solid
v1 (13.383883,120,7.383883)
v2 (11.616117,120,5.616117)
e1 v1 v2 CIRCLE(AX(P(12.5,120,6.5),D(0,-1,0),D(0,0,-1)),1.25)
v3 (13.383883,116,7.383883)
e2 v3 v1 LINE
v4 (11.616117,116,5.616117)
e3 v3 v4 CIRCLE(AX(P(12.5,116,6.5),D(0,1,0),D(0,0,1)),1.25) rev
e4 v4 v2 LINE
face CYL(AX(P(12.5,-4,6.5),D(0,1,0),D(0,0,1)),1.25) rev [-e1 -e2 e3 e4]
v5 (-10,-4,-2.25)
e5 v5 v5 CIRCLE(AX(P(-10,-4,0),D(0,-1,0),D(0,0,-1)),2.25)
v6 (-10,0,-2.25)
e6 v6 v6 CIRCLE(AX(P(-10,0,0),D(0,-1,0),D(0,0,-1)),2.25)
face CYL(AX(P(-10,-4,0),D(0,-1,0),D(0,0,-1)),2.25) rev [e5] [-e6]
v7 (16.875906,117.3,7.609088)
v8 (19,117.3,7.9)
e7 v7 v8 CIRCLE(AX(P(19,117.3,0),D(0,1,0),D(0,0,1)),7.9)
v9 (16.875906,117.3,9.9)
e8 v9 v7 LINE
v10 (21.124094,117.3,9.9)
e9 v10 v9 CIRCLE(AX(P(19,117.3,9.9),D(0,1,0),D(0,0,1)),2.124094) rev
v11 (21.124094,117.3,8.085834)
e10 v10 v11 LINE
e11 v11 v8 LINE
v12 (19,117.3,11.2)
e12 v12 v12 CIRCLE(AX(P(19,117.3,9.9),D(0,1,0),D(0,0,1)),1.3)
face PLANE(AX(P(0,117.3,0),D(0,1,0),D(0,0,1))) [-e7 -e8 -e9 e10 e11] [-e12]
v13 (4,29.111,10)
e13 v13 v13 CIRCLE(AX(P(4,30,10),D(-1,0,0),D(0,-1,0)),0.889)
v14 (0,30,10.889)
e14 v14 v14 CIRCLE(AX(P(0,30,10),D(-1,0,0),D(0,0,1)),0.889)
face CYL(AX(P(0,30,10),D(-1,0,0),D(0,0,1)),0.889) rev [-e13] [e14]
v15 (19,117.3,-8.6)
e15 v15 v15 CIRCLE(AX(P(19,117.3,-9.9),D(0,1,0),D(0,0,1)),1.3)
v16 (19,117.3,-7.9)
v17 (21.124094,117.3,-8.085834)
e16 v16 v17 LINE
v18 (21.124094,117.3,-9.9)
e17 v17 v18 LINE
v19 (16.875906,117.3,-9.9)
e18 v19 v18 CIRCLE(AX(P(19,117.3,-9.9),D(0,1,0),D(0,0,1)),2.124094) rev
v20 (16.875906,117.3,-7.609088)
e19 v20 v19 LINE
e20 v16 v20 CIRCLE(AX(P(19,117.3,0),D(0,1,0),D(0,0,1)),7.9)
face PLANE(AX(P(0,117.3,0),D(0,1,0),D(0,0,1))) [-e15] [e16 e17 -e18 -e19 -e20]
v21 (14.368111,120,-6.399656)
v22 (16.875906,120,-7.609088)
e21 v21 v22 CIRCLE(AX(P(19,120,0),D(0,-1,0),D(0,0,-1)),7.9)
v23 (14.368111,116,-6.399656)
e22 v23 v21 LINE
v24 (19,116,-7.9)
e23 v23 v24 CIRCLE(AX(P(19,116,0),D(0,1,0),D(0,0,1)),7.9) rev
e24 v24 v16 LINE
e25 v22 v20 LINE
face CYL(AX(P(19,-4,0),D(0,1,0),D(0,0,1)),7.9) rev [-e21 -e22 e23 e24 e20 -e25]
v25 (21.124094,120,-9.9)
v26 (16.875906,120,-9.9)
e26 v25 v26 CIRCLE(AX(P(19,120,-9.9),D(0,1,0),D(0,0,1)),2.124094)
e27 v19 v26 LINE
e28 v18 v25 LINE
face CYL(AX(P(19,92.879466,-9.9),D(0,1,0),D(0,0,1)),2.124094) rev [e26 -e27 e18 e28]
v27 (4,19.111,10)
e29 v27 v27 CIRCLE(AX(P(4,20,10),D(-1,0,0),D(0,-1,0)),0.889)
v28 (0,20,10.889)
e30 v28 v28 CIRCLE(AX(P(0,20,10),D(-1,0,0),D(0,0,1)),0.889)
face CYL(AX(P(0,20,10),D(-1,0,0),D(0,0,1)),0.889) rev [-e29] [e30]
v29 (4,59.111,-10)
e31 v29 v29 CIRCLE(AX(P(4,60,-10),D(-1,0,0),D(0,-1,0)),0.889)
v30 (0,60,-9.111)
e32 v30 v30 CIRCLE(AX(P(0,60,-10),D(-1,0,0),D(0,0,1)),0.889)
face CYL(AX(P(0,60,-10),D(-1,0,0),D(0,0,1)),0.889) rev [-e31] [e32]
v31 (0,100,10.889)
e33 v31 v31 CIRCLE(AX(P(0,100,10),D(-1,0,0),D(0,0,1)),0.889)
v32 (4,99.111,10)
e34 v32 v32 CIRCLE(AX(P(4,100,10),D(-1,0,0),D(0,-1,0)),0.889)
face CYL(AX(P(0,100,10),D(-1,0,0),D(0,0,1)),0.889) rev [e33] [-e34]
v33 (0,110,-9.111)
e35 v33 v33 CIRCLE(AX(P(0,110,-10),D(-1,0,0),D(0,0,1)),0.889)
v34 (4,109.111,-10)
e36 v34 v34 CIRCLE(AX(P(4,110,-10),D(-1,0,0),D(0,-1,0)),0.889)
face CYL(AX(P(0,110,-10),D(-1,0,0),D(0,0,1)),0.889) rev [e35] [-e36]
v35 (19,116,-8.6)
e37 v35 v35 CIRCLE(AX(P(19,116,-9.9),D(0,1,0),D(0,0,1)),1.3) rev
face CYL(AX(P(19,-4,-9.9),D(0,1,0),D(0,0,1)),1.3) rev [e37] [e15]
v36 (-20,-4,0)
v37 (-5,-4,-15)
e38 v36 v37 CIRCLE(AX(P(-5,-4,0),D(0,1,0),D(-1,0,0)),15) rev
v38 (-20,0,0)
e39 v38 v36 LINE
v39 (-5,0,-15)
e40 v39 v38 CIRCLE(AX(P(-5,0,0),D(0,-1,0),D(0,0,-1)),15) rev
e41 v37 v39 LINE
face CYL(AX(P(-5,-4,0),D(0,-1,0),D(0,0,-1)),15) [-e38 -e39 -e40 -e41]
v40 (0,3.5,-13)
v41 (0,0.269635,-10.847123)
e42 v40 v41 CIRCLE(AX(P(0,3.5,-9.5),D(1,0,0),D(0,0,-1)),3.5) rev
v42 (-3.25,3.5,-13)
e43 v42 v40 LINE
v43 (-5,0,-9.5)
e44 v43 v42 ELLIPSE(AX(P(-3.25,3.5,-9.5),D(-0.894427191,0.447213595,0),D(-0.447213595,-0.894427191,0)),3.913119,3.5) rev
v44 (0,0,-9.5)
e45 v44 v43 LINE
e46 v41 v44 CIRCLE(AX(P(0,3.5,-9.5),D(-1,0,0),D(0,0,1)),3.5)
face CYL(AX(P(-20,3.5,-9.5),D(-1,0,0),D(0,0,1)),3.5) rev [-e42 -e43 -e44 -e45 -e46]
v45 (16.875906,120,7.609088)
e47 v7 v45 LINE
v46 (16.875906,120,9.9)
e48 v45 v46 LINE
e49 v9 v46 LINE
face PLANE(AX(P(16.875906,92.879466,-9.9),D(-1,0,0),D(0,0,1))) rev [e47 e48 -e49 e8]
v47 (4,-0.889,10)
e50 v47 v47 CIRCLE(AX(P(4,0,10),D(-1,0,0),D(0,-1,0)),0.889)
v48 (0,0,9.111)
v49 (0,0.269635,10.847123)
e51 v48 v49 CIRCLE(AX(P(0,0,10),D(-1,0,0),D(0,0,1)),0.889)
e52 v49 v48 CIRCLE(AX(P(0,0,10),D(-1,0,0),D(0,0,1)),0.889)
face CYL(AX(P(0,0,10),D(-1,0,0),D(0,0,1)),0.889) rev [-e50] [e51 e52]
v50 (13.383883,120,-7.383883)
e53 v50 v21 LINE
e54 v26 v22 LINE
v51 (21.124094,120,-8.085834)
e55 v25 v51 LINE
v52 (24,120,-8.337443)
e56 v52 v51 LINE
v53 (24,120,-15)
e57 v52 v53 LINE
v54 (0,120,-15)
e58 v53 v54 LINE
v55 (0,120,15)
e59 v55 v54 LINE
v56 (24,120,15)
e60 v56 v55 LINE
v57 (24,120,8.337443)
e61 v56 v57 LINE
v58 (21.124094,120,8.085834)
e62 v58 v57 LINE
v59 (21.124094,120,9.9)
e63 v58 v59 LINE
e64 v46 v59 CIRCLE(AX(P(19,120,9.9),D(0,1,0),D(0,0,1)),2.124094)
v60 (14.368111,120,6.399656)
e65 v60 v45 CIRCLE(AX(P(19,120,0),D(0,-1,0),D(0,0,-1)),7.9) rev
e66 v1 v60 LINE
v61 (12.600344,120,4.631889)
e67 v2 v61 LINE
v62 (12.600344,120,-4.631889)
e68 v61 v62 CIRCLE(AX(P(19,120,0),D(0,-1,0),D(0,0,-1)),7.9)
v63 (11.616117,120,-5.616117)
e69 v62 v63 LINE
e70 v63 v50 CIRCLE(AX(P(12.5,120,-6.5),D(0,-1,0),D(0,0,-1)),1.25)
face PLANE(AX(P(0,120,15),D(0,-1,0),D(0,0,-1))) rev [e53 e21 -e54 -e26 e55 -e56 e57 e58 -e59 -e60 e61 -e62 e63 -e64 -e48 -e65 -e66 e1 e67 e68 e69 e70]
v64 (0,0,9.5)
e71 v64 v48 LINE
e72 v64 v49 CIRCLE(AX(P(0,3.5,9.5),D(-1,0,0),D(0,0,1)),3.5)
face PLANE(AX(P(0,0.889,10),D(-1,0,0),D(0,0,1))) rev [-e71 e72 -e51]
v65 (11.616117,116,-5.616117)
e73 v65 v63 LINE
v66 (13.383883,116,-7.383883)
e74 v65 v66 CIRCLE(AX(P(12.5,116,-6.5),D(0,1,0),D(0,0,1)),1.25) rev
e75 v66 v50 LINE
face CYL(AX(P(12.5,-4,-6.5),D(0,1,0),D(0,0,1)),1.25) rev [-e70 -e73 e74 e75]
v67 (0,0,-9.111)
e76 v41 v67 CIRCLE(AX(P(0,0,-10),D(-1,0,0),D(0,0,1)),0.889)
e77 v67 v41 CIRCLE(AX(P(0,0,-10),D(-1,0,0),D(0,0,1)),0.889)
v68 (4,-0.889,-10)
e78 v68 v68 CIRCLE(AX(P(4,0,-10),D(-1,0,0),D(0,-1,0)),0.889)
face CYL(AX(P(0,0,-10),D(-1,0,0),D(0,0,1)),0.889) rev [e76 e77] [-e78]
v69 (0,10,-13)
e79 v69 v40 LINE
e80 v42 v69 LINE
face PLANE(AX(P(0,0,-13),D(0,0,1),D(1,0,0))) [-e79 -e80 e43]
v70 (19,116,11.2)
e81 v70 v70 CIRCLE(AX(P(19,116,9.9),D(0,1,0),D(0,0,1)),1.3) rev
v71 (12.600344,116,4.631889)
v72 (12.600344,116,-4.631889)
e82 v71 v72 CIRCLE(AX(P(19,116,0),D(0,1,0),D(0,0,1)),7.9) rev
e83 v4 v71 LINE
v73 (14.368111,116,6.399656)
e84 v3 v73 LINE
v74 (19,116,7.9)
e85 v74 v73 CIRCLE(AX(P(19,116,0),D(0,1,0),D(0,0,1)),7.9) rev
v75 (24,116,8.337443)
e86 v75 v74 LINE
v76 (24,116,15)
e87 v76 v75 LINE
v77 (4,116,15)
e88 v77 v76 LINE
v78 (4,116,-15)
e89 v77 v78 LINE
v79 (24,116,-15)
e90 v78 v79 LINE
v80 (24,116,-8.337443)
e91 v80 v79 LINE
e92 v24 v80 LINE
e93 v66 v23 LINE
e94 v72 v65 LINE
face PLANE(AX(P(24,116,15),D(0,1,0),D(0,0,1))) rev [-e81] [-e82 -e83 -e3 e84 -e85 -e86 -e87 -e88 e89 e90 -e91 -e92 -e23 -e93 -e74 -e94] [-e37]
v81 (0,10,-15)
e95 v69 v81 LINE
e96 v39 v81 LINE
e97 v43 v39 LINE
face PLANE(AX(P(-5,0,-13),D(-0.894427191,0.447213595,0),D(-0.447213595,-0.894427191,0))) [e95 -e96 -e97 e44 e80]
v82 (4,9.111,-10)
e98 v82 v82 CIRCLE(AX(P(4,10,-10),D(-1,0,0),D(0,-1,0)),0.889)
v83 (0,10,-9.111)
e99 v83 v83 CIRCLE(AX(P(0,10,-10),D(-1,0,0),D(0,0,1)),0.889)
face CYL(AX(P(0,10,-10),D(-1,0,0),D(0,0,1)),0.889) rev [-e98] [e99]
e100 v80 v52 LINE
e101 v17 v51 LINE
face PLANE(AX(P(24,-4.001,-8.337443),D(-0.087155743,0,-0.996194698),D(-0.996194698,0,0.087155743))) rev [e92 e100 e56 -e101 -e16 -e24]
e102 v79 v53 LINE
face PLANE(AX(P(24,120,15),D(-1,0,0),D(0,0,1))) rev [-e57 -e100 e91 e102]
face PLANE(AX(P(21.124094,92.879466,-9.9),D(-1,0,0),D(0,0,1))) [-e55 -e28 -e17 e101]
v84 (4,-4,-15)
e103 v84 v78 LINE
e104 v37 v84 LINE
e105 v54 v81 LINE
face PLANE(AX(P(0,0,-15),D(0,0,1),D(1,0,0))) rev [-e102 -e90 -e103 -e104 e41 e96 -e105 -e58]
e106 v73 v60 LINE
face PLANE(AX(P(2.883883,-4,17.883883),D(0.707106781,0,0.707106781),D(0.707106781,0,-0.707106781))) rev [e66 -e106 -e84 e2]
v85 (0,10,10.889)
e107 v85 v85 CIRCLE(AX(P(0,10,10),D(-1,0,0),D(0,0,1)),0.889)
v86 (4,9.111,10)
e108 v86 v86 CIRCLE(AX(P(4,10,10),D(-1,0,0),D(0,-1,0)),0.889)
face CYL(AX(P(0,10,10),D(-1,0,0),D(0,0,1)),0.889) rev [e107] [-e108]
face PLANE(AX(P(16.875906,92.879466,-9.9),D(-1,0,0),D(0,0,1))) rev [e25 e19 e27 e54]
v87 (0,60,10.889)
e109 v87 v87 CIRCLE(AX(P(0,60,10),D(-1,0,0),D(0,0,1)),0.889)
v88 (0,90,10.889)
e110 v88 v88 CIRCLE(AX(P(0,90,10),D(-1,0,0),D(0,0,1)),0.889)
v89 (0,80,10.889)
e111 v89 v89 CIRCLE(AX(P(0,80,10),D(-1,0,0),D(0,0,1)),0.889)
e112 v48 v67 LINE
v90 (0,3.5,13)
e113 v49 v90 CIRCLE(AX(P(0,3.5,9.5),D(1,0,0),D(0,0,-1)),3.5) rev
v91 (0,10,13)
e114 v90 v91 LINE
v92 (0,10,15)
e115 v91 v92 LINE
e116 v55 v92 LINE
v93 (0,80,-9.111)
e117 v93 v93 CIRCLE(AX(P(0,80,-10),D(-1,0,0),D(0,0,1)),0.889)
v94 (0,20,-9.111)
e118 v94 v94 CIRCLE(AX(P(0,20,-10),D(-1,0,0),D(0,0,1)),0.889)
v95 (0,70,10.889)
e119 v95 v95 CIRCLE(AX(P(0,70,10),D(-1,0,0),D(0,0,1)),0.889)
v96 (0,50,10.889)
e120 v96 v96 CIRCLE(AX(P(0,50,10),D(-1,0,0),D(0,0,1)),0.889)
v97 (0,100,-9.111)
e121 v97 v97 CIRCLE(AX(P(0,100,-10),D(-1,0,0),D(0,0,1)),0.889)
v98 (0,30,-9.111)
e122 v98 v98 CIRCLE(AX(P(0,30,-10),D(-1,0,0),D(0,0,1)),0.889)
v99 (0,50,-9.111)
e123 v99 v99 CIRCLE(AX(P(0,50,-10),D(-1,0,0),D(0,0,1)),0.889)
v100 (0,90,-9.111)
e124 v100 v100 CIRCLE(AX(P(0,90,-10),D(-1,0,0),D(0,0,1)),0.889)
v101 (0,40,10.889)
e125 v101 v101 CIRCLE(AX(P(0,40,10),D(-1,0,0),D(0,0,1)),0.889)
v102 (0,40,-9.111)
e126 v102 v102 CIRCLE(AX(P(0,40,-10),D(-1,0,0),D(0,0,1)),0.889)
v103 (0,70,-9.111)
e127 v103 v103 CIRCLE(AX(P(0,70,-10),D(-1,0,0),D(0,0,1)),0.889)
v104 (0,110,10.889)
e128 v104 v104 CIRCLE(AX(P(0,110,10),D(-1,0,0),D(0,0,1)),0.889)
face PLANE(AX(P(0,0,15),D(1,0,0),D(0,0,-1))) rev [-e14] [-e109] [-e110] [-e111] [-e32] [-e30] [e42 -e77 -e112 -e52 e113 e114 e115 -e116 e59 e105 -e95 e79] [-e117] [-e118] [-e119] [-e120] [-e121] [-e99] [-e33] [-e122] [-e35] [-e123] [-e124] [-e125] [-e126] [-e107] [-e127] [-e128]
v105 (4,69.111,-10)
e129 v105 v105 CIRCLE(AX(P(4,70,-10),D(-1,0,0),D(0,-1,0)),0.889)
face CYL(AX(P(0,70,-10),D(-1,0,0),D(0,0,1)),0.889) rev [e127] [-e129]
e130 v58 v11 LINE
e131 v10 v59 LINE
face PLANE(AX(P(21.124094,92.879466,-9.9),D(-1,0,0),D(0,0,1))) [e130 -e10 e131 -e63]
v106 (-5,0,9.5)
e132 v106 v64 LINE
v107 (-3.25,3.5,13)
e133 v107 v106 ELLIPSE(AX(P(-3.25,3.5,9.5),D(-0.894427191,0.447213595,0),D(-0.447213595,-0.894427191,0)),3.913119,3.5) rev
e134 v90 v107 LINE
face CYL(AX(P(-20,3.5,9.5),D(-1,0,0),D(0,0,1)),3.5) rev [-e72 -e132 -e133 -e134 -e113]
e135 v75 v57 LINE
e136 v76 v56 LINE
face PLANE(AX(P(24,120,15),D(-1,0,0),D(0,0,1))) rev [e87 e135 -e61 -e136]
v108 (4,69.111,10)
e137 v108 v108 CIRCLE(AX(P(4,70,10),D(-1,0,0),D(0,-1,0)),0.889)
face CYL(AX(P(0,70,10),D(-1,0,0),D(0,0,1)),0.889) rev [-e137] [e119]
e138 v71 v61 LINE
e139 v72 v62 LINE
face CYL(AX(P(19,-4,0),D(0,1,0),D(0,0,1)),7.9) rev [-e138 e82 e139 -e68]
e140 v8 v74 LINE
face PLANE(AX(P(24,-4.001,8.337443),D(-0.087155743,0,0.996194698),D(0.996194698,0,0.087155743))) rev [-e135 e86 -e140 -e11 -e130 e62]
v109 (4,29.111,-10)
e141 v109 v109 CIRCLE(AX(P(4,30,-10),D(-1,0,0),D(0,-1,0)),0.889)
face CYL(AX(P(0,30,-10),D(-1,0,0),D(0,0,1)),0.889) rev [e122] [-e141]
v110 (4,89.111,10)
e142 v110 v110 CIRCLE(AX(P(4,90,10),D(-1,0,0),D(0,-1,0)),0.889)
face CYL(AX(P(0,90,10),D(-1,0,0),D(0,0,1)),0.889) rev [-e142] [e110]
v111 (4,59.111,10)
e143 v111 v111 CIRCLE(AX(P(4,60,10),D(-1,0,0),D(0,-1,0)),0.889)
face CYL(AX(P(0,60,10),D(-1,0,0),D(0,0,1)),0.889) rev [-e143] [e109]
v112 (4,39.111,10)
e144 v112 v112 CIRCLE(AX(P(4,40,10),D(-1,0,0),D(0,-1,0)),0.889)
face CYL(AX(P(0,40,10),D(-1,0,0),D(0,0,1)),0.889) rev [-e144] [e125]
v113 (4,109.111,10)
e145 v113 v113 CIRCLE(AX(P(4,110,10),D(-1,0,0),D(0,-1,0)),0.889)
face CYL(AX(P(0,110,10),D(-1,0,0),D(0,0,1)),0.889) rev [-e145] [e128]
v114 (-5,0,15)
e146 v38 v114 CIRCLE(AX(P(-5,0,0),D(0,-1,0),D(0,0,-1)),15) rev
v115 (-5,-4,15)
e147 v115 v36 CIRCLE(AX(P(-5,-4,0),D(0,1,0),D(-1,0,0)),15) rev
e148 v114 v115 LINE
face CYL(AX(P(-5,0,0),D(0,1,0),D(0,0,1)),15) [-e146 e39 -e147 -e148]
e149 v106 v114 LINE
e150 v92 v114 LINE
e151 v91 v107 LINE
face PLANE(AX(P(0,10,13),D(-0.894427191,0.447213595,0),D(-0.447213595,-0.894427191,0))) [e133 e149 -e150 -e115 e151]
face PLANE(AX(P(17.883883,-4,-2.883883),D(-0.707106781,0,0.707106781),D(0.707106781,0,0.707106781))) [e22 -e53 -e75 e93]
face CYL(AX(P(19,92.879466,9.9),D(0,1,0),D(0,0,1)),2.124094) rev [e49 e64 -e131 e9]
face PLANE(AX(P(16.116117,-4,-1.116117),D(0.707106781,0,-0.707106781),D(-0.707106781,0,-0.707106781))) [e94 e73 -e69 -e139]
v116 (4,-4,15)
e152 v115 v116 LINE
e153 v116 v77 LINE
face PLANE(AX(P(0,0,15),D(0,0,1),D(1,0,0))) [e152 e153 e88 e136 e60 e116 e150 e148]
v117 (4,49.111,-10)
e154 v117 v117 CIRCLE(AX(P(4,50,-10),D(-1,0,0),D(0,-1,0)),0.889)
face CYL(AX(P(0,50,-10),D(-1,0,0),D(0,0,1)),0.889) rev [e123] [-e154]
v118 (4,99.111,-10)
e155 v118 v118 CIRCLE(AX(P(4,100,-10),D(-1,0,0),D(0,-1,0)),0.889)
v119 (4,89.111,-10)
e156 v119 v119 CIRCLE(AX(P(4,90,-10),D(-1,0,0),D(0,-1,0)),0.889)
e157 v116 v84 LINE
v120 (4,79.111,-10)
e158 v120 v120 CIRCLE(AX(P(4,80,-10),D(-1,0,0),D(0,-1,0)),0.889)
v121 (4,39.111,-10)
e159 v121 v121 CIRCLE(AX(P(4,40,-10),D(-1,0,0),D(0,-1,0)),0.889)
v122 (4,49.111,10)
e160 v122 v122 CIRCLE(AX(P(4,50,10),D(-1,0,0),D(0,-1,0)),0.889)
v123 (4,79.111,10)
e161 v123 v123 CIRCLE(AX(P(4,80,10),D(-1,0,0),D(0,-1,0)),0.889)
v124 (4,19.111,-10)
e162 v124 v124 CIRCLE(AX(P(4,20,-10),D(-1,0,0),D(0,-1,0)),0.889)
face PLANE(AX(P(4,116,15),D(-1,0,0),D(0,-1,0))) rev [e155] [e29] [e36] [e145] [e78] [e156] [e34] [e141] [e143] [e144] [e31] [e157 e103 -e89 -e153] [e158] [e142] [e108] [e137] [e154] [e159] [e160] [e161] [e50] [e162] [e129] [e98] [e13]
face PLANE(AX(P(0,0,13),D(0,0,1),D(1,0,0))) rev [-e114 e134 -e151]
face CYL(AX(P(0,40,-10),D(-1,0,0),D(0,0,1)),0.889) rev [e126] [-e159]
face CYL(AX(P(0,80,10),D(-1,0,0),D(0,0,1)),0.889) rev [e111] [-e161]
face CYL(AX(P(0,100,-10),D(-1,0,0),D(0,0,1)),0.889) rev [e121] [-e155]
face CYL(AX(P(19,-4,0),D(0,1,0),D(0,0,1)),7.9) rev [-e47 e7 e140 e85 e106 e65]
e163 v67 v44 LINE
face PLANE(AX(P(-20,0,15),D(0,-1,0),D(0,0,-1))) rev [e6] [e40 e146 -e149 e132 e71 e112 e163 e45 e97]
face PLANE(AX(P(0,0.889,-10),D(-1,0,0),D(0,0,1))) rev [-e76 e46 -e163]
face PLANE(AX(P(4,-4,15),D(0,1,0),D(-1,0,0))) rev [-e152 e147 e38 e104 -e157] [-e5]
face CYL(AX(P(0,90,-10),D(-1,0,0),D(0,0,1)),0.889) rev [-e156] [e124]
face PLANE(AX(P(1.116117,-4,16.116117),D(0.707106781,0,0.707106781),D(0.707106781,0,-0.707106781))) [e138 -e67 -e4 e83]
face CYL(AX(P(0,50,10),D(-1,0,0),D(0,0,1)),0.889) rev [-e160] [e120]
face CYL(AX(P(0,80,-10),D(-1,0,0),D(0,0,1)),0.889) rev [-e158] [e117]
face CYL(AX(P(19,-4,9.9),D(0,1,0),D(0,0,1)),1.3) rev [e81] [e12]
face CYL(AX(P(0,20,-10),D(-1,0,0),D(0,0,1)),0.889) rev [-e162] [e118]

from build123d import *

# Parameters (mm, degrees)
BRACKETMAINBODY_DEPTH         = 15
CUTEXTRUDE_SQUIDCUTOUTS_START = 120
SQUIDCUTOUTS_R                = 1.3
CUTEXTRUDE_SQUIDCUTOUTS_DEPTH = 244.292335528
M4_CLEARANCE_HOLE1_D          = 4.5
CUT_EXTRUDE12_REACH           = 129.189
FILLET11_R                    = 15
FILLET12_R                    = 15
F_2_56_TAPPED_HOLE1_D         = 1.778
LPATTERN3_OUTLINE_R           = 0.889
LPATTERN3_DEPTH               = 4
CUT_EXTRUDE14_START           = -2.7
CUT_EXTRUDE14_OUTLINE_R       = 1.3
CUT_EXTRUDE14_DEPTH           = 2.7
BOSS_EXTRUDE3_DEPTH           = 2
BOSS_EXTRUDE4_DEPTH           = 2
FILLET17_R                    = 3.5
FILLET18_R                    = 3.5


# Read off the part's stored shape, not the designer's step: LPattern3, Cut-Extrude14
# Some blends are built 0.0001 mm under size
with BuildPart() as part:
    # Sketch1 → BracketMainBody (new, symmetric)
    with BuildSketch(Plane.XY):
        Polygon((0, 0), (0, 120), (24, 120), (24, 116), (4, 116), (4, -4), (-20, -4), (-20, 0), align=None)
    extrude(amount=BRACKETMAINBODY_DEPTH, both=True)

    # SQUIDcutouts → CutExtrude_SQUIDcutouts (cut, through all)
    with BuildSketch(Plane(origin=(0, 0, 0), x_dir=(1, 0, 0), z_dir=(0, 1, 0)).offset(CUTEXTRUDE_SQUIDCUTOUTS_START)):
        with Locations(Location((19, -9.9, 0), (0, 0, 270))):
            Circle(SQUIDCUTOUTS_R)
        with Locations(Location((19, 9.9, 0), (0, 0, 270))):
            Circle(SQUIDCUTOUTS_R)
        with BuildLine():
            Line((12.600343686, 4.631889361), (11.616116524, 5.616116524))
            ThreePointArc((11.616116524, 5.616116524), (11.616116524, 7.383883476), (13.383883476, 7.383883476))
            Line((13.383883476, 7.383883476), (14.368110639, 6.399656314))
            ThreePointArc((14.368110639, 6.399656314), (26.9, 0), (14.368110639, -6.399656314))
            Line((14.368110639, -6.399656314), (13.383883476, -7.383883476))
            ThreePointArc((13.383883476, -7.383883476), (11.616116524, -7.383883476), (11.616116524, -5.616116524))
            Line((11.616116524, -5.616116524), (12.600343686, -4.631889361))
            ThreePointArc((12.600343686, -4.631889361), (11.1, 0), (12.600343686, 4.631889361))
        make_face()
    extrude(amount=-CUTEXTRUDE_SQUIDCUTOUTS_DEPTH, mode=Mode.SUBTRACT)

    # M4 Clearance Hole1 (through all)
    with Locations(Plane(origin=(-10, -4, 0), x_dir=(-1, 0, 0), z_dir=(0, -1, 0))):
        with Locations((0, 0)):
            Hole(M4_CLEARANCE_HOLE1_D / 2)

    # champhers<2> → Cut-Extrude12 (cut, up to next)
    with BuildSketch(Plane(origin=(0, 120, 0), x_dir=(1, 0, 0), z_dir=(0, 1, 0)), mode=Mode.PRIVATE) as cut_extrude12_sk1:
        Polygon((24, 8.337443318), (24, 6.116371473), (19, 7.9), align=None)
    cut_extrude12_tool1 = extrude(cut_extrude12_sk1.sketch, amount=-CUT_EXTRUDE12_REACH, mode=Mode.PRIVATE) & part.part
    # champhers<2> → Cut-Extrude12 (cut, up to next)
    with BuildSketch(Plane(origin=(0, 120, 0), x_dir=(1, 0, 0), z_dir=(0, 1, 0)), mode=Mode.PRIVATE) as cut_extrude12_sk2:
        Polygon((24, -6.116371473), (19, -7.9), (24, -8.337443318), align=None)
    cut_extrude12_tool2 = extrude(cut_extrude12_sk2.sketch, amount=-CUT_EXTRUDE12_REACH, mode=Mode.PRIVATE) & part.part
    add(cut_extrude12_tool1.solids().sort_by_distance((22.333333, 120, -7.451272))[0], mode=Mode.SUBTRACT)
    add(cut_extrude12_tool2.solids().sort_by_distance((22.333333, 120, 7.451272))[0], mode=Mode.SUBTRACT)

    # Fillet11
    fillet11_edges = [part.edges().sort_by_distance(p)[0] for p in [
        (-20, -2, -15),
    ]]
    fillet(fillet11_edges, radius=FILLET11_R)

    # Fillet12
    fillet12_edges = [part.edges().sort_by_distance(p)[0] for p in [
        (-20, -2, 15),
    ]]
    fillet(fillet12_edges, radius=FILLET12_R - 0.0001)  # a hair under: the kernel refuses the full size

    # #2-56 Tapped Hole1 (through all)
    with Locations(Plane(origin=(0, 110, -10), x_dir=(0, 0, -1), z_dir=(-1, 0, 0))):
        with Locations((0, 0)):
            Hole(F_2_56_TAPPED_HOLE1_D / 2)

    # LPattern3 outline → LPattern3 (cut)
    with BuildSketch(Plane.YZ):
        with Locations((110, 10)):
            Circle(LPATTERN3_OUTLINE_R)
        with Locations((100, -10)):
            Circle(LPATTERN3_OUTLINE_R)
        with Locations((100, 10)):
            Circle(LPATTERN3_OUTLINE_R)
        with Locations((90, -10)):
            Circle(LPATTERN3_OUTLINE_R)
        with Locations((90, 10)):
            Circle(LPATTERN3_OUTLINE_R)
        with Locations((80, -10)):
            Circle(LPATTERN3_OUTLINE_R)
        with Locations((80, 10)):
            Circle(LPATTERN3_OUTLINE_R)
        with Locations((70, -10)):
            Circle(LPATTERN3_OUTLINE_R)
        with Locations((70, 10)):
            Circle(LPATTERN3_OUTLINE_R)
        with Locations((60, -10)):
            Circle(LPATTERN3_OUTLINE_R)
        with Locations((60, 10)):
            Circle(LPATTERN3_OUTLINE_R)
        with Locations((50, -10)):
            Circle(LPATTERN3_OUTLINE_R)
        with Locations((50, 10)):
            Circle(LPATTERN3_OUTLINE_R)
        with Locations((40, -10)):
            Circle(LPATTERN3_OUTLINE_R)
        with Locations((40, 10)):
            Circle(LPATTERN3_OUTLINE_R)
        with Locations((30, -10)):
            Circle(LPATTERN3_OUTLINE_R)
        with Locations((30, 10)):
            Circle(LPATTERN3_OUTLINE_R)
        with Locations((20, -10)):
            Circle(LPATTERN3_OUTLINE_R)
        with Locations((20, 10)):
            Circle(LPATTERN3_OUTLINE_R)
        with Locations((10, -10)):
            Circle(LPATTERN3_OUTLINE_R)
        with Locations((10, 10)):
            Circle(LPATTERN3_OUTLINE_R)
        with Locations((0, -10)):
            Circle(LPATTERN3_OUTLINE_R)
        with Locations((0, 10)):
            Circle(LPATTERN3_OUTLINE_R)
    extrude(amount=LPATTERN3_DEPTH, mode=Mode.SUBTRACT)

    # Cut-Extrude14 outline → Cut-Extrude14 (cut)
    # profile 1 of 2: a face of its own
    with BuildSketch(Plane(origin=(0, 120, 0), x_dir=(1, 0, 0), z_dir=(0, 1, 0)).offset(CUT_EXTRUDE14_START)):
        with BuildLine():
            Line((21.124094102, -9.9), (21.124094102, -8.085834154))
            Line((21.124094102, -8.085834154), (19, -7.9))
            ThreePointArc((19, -7.9), (17.928038551, -7.82693418), (16.875905898, -7.609088267))
            Line((16.875905898, -7.609088267), (16.875905898, -9.9))
            ThreePointArc((16.875905898, -9.9), (19, -12.024094102), (21.124094102, -9.9))
        make_face()
        with Locations((19, -9.9)):
            Circle(CUT_EXTRUDE14_OUTLINE_R, mode=Mode.SUBTRACT)
    # profile 2 of 2: a face of its own
    with BuildSketch(Plane(origin=(0, 120, 0), x_dir=(1, 0, 0), z_dir=(0, 1, 0)).offset(CUT_EXTRUDE14_START)):
        with BuildLine():
            Line((21.124094102, 8.085834154), (21.124094102, 9.9))
            ThreePointArc((21.124094102, 9.9), (19, 12.024094102), (16.875905898, 9.9))
            Line((16.875905898, 9.9), (16.875905898, 7.609088267))
            ThreePointArc((16.875905898, 7.609088267), (17.928038551, 7.82693418), (19, 7.9))
            Line((19, 7.9), (21.124094102, 8.085834154))
        make_face()
        with Locations((19, 9.9)):
            Circle(CUT_EXTRUDE14_OUTLINE_R, mode=Mode.SUBTRACT)
    extrude(amount=CUT_EXTRUDE14_DEPTH, mode=Mode.SUBTRACT)

    # Sketch30 → Boss-Extrude3 (add)
    with BuildSketch(Plane.XY.offset(15)):
        Polygon((-5, 0), (0, 0), (0, 10), align=None)
    extrude(amount=-BOSS_EXTRUDE3_DEPTH)

    # Sketch31 → Boss-Extrude4 (add)
    with BuildSketch(Plane(origin=(0, 0, -15), x_dir=(-1, 0, 0), z_dir=(0, 0, -1))):
        Polygon((0, 10), (0, 0), (5, 0), align=None)
    extrude(amount=-BOSS_EXTRUDE4_DEPTH)

    # Fillet17
    # the kernel refuses this fillet: 3.5 mm, written as the material it adds along each edge
    with BuildSketch(Plane(origin=(0, 0, -13), x_dir=(0, 0, 1), z_dir=(-1, 0, 0))) as fillet17_piece_1_section:
        with BuildLine():
            CenterArc((FILLET17_R, FILLET17_R), FILLET17_R, 180, 90)
            Line((0, FILLET17_R), (0, 0))
            Line((0, 0), (FILLET17_R, 0))
        make_face()
    fillet17_piece_1 = extrude(amount=13.75, mode=Mode.PRIVATE)
    fillet17_piece_1 = split(fillet17_piece_1, bisect_by=Plane(origin=(-4.463461732, 1.073076536, -10.533039881), z_dir=(0.894427190999916, -0.44721359549995787, 0)), keep=Keep.TOP, mode=Mode.PRIVATE)
    add(fillet17_piece_1)

    # Fillet18
    # the kernel refuses this fillet: 3.5 mm, written as the material it adds along each edge
    with BuildSketch(Plane(origin=(-13.75, 0, 13), x_dir=(0, 1, 0), z_dir=(1, 0, 0))) as fillet18_piece_1_section:
        with BuildLine():
            CenterArc((FILLET18_R, -FILLET18_R), FILLET18_R, 90, 90)
            Line((0, -FILLET18_R), (0, 0))
            Line((0, 0), (FILLET18_R, 0))
        make_face()
    fillet18_piece_1 = extrude(amount=13.75, mode=Mode.PRIVATE)
    fillet18_piece_1 = split(fillet18_piece_1, bisect_by=Plane(origin=(-4.153126037, 1.693747927, 12.281398302), z_dir=(0.894427190999916, -0.447213595499958, 0)), keep=Keep.TOP, mode=Mode.PRIVATE)
    add(fillet18_piece_1)


solid = part.part
